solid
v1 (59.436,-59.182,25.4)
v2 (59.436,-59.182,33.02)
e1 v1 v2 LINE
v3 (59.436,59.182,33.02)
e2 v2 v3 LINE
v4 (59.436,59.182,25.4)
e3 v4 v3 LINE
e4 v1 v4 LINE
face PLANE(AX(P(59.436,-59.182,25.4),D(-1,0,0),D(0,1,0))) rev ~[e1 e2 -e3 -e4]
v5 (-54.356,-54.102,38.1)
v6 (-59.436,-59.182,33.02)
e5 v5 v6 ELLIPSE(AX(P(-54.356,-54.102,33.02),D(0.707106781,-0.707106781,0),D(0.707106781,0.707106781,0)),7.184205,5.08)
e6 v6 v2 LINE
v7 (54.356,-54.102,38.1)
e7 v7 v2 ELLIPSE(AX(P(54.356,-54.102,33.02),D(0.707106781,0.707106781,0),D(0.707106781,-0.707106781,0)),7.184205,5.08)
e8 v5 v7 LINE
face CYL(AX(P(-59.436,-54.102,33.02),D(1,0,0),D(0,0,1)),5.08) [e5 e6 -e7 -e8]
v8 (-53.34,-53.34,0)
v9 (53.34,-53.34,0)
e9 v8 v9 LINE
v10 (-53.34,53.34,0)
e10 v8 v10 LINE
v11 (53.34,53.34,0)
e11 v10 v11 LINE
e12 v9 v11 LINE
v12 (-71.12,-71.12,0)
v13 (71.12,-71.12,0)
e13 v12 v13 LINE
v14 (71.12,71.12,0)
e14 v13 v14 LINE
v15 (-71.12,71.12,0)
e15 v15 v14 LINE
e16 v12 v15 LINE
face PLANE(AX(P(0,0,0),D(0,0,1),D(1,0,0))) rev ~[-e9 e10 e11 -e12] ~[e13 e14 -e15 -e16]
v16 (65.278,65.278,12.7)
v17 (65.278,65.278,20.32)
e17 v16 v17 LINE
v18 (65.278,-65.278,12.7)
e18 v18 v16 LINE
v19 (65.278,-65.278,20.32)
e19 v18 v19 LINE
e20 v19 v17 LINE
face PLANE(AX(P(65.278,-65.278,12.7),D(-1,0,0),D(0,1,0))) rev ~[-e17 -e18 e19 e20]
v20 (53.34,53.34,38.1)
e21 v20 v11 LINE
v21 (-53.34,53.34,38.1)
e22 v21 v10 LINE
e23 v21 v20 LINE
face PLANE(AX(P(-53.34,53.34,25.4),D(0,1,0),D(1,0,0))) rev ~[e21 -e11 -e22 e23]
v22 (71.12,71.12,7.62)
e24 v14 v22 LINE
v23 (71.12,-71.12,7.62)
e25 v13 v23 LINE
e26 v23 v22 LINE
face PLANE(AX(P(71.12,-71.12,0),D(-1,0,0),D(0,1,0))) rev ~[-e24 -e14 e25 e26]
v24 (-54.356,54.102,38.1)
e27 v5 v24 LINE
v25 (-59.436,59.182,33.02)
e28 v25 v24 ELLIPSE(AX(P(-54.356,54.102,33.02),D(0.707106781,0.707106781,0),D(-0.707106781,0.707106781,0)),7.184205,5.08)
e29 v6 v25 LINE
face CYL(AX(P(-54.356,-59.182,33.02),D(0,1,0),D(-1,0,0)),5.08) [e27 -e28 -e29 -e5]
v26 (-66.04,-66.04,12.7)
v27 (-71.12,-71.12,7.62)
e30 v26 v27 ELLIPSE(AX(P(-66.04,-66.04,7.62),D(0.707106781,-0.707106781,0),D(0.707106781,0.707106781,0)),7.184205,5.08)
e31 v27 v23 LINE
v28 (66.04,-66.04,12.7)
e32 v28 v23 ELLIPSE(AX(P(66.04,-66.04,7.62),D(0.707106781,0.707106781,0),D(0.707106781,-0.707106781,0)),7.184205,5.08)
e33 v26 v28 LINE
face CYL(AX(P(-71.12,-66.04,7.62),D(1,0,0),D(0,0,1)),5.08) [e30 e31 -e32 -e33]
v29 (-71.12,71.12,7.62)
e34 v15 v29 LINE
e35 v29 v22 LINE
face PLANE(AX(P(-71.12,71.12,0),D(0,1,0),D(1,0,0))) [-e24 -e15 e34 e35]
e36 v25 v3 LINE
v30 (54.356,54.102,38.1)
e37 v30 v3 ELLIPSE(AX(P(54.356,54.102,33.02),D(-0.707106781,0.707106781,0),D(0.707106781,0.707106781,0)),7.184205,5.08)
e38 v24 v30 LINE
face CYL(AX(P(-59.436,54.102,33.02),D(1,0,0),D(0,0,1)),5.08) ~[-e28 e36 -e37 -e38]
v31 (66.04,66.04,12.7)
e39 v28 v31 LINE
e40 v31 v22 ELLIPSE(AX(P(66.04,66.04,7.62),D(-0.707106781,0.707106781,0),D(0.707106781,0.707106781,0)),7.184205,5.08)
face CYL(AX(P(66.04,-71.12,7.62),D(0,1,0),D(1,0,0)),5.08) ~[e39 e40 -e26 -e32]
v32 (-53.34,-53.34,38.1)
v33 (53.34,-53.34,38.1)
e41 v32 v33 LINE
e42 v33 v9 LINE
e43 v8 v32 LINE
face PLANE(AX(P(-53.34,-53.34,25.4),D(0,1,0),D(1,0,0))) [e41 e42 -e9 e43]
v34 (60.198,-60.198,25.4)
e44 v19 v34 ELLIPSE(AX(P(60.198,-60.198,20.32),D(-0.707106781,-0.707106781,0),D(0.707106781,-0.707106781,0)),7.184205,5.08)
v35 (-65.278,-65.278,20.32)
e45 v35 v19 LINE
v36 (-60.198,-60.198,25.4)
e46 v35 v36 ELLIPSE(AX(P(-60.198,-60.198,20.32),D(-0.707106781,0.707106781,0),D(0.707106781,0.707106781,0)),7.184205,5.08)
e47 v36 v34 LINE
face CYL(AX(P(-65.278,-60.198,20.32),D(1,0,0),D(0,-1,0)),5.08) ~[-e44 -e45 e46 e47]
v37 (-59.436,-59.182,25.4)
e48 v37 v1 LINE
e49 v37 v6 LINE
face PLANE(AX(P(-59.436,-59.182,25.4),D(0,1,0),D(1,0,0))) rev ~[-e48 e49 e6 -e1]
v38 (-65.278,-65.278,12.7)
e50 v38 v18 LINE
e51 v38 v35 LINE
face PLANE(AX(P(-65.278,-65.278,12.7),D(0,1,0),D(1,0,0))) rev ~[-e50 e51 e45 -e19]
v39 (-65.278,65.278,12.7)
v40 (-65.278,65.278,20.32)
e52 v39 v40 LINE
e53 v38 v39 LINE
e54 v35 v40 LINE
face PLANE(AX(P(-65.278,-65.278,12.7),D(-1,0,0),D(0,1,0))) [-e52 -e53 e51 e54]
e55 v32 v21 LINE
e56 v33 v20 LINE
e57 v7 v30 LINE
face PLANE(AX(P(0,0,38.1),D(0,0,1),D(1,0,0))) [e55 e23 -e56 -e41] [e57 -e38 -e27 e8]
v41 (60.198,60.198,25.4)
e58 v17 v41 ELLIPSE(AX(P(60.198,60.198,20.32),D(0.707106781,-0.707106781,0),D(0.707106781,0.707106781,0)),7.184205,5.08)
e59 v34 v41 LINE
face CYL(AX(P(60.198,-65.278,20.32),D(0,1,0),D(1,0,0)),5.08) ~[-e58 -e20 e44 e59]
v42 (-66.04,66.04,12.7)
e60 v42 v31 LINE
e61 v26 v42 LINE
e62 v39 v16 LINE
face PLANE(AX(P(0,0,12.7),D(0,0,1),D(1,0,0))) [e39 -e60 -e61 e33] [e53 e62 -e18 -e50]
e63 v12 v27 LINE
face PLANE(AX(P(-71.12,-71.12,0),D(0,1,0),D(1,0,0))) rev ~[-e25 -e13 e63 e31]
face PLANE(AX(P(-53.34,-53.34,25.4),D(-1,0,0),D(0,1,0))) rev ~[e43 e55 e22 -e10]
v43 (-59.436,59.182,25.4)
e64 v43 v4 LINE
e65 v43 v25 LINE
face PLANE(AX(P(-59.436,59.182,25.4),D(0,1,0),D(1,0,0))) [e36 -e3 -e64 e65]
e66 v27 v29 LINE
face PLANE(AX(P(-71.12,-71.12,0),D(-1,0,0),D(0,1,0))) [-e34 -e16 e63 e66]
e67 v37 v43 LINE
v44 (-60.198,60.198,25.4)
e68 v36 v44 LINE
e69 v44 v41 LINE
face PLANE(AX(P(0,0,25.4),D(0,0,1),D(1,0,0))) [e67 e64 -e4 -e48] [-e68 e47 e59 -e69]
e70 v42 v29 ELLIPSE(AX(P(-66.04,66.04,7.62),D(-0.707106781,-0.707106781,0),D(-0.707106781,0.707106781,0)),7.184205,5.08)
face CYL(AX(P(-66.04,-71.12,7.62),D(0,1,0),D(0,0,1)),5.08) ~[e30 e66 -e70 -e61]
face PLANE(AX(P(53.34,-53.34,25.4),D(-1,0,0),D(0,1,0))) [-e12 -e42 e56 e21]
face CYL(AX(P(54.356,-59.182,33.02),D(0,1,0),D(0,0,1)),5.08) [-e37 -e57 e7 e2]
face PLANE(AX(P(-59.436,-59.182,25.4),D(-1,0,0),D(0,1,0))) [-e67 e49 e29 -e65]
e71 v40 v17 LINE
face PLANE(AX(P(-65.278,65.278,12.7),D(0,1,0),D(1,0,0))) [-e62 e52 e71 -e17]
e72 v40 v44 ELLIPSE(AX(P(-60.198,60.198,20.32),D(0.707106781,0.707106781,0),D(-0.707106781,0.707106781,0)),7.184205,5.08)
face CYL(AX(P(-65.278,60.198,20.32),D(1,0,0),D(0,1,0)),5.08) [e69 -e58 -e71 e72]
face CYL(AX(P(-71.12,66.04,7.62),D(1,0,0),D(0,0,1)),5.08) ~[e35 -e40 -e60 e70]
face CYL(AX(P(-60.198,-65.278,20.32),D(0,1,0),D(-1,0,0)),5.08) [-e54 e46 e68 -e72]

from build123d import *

# Parameters (mm, degrees)
F0_W     = 142.24
F0_H     = 142.24
F1_DEPTH = 12.7
F2_W     = 106.68
F2_H     = 106.68
F3_DEPTH = 12.701
F4_W     = 130.556
F4_H     = 130.556
F4_W_2   = 106.68
F4_H_2   = 106.68
F5_DEPTH = 12.7
F6_W     = 118.872
F6_H     = 118.364
F6_W_2   = 106.68
F6_H_2   = 106.68
F7_DEPTH = 12.7
F8_R     = 5.08


with BuildPart() as f1:
    # F0 (on Top) → F1 (new body)
    with BuildSketch(Plane.XY):
        Rectangle(F0_W, F0_H)
    extrude(amount=F1_DEPTH)

    # F2 (on face) → F3 (cut, through all)
    with BuildSketch(Plane.XY.offset(12.7)):
        Rectangle(F2_W, F2_H)
    extrude(amount=-F3_DEPTH, mode=Mode.SUBTRACT)

    # F4 (on face) → F5 (join)
    with BuildSketch(Plane.XY.offset(12.7)):
        Rectangle(F4_W, F4_H)
        Rectangle(F4_W_2, F4_H_2, mode=Mode.SUBTRACT)
    extrude(amount=F5_DEPTH)

    # F6 (on face) → F7 (join)
    with BuildSketch(Plane.XY.offset(25.4)):
        Rectangle(F6_W, F6_H)
        Rectangle(F6_W_2, F6_H_2, mode=Mode.SUBTRACT)
    extrude(amount=F7_DEPTH)

    # F8
    f8_edges = [f1.edges().sort_by_distance(p)[0] for p in [
        (0, -59.182, 38.1),
        (-59.436, 0, 38.1),
        (0, -65.278, 25.4),
        (0, -71.12, 12.7),
        (-71.12, 0, 12.7),
        (-65.278, 0, 25.4),
        (0, 71.12, 12.7),
        (0, 65.278, 25.4),
        (0, 59.182, 38.1),
        (59.436, 0, 38.1),
        (65.278, 0, 25.4),
        (71.12, 0, 12.7),
    ]]
    fillet(f8_edges, radius=F8_R)


solid = f1.part
